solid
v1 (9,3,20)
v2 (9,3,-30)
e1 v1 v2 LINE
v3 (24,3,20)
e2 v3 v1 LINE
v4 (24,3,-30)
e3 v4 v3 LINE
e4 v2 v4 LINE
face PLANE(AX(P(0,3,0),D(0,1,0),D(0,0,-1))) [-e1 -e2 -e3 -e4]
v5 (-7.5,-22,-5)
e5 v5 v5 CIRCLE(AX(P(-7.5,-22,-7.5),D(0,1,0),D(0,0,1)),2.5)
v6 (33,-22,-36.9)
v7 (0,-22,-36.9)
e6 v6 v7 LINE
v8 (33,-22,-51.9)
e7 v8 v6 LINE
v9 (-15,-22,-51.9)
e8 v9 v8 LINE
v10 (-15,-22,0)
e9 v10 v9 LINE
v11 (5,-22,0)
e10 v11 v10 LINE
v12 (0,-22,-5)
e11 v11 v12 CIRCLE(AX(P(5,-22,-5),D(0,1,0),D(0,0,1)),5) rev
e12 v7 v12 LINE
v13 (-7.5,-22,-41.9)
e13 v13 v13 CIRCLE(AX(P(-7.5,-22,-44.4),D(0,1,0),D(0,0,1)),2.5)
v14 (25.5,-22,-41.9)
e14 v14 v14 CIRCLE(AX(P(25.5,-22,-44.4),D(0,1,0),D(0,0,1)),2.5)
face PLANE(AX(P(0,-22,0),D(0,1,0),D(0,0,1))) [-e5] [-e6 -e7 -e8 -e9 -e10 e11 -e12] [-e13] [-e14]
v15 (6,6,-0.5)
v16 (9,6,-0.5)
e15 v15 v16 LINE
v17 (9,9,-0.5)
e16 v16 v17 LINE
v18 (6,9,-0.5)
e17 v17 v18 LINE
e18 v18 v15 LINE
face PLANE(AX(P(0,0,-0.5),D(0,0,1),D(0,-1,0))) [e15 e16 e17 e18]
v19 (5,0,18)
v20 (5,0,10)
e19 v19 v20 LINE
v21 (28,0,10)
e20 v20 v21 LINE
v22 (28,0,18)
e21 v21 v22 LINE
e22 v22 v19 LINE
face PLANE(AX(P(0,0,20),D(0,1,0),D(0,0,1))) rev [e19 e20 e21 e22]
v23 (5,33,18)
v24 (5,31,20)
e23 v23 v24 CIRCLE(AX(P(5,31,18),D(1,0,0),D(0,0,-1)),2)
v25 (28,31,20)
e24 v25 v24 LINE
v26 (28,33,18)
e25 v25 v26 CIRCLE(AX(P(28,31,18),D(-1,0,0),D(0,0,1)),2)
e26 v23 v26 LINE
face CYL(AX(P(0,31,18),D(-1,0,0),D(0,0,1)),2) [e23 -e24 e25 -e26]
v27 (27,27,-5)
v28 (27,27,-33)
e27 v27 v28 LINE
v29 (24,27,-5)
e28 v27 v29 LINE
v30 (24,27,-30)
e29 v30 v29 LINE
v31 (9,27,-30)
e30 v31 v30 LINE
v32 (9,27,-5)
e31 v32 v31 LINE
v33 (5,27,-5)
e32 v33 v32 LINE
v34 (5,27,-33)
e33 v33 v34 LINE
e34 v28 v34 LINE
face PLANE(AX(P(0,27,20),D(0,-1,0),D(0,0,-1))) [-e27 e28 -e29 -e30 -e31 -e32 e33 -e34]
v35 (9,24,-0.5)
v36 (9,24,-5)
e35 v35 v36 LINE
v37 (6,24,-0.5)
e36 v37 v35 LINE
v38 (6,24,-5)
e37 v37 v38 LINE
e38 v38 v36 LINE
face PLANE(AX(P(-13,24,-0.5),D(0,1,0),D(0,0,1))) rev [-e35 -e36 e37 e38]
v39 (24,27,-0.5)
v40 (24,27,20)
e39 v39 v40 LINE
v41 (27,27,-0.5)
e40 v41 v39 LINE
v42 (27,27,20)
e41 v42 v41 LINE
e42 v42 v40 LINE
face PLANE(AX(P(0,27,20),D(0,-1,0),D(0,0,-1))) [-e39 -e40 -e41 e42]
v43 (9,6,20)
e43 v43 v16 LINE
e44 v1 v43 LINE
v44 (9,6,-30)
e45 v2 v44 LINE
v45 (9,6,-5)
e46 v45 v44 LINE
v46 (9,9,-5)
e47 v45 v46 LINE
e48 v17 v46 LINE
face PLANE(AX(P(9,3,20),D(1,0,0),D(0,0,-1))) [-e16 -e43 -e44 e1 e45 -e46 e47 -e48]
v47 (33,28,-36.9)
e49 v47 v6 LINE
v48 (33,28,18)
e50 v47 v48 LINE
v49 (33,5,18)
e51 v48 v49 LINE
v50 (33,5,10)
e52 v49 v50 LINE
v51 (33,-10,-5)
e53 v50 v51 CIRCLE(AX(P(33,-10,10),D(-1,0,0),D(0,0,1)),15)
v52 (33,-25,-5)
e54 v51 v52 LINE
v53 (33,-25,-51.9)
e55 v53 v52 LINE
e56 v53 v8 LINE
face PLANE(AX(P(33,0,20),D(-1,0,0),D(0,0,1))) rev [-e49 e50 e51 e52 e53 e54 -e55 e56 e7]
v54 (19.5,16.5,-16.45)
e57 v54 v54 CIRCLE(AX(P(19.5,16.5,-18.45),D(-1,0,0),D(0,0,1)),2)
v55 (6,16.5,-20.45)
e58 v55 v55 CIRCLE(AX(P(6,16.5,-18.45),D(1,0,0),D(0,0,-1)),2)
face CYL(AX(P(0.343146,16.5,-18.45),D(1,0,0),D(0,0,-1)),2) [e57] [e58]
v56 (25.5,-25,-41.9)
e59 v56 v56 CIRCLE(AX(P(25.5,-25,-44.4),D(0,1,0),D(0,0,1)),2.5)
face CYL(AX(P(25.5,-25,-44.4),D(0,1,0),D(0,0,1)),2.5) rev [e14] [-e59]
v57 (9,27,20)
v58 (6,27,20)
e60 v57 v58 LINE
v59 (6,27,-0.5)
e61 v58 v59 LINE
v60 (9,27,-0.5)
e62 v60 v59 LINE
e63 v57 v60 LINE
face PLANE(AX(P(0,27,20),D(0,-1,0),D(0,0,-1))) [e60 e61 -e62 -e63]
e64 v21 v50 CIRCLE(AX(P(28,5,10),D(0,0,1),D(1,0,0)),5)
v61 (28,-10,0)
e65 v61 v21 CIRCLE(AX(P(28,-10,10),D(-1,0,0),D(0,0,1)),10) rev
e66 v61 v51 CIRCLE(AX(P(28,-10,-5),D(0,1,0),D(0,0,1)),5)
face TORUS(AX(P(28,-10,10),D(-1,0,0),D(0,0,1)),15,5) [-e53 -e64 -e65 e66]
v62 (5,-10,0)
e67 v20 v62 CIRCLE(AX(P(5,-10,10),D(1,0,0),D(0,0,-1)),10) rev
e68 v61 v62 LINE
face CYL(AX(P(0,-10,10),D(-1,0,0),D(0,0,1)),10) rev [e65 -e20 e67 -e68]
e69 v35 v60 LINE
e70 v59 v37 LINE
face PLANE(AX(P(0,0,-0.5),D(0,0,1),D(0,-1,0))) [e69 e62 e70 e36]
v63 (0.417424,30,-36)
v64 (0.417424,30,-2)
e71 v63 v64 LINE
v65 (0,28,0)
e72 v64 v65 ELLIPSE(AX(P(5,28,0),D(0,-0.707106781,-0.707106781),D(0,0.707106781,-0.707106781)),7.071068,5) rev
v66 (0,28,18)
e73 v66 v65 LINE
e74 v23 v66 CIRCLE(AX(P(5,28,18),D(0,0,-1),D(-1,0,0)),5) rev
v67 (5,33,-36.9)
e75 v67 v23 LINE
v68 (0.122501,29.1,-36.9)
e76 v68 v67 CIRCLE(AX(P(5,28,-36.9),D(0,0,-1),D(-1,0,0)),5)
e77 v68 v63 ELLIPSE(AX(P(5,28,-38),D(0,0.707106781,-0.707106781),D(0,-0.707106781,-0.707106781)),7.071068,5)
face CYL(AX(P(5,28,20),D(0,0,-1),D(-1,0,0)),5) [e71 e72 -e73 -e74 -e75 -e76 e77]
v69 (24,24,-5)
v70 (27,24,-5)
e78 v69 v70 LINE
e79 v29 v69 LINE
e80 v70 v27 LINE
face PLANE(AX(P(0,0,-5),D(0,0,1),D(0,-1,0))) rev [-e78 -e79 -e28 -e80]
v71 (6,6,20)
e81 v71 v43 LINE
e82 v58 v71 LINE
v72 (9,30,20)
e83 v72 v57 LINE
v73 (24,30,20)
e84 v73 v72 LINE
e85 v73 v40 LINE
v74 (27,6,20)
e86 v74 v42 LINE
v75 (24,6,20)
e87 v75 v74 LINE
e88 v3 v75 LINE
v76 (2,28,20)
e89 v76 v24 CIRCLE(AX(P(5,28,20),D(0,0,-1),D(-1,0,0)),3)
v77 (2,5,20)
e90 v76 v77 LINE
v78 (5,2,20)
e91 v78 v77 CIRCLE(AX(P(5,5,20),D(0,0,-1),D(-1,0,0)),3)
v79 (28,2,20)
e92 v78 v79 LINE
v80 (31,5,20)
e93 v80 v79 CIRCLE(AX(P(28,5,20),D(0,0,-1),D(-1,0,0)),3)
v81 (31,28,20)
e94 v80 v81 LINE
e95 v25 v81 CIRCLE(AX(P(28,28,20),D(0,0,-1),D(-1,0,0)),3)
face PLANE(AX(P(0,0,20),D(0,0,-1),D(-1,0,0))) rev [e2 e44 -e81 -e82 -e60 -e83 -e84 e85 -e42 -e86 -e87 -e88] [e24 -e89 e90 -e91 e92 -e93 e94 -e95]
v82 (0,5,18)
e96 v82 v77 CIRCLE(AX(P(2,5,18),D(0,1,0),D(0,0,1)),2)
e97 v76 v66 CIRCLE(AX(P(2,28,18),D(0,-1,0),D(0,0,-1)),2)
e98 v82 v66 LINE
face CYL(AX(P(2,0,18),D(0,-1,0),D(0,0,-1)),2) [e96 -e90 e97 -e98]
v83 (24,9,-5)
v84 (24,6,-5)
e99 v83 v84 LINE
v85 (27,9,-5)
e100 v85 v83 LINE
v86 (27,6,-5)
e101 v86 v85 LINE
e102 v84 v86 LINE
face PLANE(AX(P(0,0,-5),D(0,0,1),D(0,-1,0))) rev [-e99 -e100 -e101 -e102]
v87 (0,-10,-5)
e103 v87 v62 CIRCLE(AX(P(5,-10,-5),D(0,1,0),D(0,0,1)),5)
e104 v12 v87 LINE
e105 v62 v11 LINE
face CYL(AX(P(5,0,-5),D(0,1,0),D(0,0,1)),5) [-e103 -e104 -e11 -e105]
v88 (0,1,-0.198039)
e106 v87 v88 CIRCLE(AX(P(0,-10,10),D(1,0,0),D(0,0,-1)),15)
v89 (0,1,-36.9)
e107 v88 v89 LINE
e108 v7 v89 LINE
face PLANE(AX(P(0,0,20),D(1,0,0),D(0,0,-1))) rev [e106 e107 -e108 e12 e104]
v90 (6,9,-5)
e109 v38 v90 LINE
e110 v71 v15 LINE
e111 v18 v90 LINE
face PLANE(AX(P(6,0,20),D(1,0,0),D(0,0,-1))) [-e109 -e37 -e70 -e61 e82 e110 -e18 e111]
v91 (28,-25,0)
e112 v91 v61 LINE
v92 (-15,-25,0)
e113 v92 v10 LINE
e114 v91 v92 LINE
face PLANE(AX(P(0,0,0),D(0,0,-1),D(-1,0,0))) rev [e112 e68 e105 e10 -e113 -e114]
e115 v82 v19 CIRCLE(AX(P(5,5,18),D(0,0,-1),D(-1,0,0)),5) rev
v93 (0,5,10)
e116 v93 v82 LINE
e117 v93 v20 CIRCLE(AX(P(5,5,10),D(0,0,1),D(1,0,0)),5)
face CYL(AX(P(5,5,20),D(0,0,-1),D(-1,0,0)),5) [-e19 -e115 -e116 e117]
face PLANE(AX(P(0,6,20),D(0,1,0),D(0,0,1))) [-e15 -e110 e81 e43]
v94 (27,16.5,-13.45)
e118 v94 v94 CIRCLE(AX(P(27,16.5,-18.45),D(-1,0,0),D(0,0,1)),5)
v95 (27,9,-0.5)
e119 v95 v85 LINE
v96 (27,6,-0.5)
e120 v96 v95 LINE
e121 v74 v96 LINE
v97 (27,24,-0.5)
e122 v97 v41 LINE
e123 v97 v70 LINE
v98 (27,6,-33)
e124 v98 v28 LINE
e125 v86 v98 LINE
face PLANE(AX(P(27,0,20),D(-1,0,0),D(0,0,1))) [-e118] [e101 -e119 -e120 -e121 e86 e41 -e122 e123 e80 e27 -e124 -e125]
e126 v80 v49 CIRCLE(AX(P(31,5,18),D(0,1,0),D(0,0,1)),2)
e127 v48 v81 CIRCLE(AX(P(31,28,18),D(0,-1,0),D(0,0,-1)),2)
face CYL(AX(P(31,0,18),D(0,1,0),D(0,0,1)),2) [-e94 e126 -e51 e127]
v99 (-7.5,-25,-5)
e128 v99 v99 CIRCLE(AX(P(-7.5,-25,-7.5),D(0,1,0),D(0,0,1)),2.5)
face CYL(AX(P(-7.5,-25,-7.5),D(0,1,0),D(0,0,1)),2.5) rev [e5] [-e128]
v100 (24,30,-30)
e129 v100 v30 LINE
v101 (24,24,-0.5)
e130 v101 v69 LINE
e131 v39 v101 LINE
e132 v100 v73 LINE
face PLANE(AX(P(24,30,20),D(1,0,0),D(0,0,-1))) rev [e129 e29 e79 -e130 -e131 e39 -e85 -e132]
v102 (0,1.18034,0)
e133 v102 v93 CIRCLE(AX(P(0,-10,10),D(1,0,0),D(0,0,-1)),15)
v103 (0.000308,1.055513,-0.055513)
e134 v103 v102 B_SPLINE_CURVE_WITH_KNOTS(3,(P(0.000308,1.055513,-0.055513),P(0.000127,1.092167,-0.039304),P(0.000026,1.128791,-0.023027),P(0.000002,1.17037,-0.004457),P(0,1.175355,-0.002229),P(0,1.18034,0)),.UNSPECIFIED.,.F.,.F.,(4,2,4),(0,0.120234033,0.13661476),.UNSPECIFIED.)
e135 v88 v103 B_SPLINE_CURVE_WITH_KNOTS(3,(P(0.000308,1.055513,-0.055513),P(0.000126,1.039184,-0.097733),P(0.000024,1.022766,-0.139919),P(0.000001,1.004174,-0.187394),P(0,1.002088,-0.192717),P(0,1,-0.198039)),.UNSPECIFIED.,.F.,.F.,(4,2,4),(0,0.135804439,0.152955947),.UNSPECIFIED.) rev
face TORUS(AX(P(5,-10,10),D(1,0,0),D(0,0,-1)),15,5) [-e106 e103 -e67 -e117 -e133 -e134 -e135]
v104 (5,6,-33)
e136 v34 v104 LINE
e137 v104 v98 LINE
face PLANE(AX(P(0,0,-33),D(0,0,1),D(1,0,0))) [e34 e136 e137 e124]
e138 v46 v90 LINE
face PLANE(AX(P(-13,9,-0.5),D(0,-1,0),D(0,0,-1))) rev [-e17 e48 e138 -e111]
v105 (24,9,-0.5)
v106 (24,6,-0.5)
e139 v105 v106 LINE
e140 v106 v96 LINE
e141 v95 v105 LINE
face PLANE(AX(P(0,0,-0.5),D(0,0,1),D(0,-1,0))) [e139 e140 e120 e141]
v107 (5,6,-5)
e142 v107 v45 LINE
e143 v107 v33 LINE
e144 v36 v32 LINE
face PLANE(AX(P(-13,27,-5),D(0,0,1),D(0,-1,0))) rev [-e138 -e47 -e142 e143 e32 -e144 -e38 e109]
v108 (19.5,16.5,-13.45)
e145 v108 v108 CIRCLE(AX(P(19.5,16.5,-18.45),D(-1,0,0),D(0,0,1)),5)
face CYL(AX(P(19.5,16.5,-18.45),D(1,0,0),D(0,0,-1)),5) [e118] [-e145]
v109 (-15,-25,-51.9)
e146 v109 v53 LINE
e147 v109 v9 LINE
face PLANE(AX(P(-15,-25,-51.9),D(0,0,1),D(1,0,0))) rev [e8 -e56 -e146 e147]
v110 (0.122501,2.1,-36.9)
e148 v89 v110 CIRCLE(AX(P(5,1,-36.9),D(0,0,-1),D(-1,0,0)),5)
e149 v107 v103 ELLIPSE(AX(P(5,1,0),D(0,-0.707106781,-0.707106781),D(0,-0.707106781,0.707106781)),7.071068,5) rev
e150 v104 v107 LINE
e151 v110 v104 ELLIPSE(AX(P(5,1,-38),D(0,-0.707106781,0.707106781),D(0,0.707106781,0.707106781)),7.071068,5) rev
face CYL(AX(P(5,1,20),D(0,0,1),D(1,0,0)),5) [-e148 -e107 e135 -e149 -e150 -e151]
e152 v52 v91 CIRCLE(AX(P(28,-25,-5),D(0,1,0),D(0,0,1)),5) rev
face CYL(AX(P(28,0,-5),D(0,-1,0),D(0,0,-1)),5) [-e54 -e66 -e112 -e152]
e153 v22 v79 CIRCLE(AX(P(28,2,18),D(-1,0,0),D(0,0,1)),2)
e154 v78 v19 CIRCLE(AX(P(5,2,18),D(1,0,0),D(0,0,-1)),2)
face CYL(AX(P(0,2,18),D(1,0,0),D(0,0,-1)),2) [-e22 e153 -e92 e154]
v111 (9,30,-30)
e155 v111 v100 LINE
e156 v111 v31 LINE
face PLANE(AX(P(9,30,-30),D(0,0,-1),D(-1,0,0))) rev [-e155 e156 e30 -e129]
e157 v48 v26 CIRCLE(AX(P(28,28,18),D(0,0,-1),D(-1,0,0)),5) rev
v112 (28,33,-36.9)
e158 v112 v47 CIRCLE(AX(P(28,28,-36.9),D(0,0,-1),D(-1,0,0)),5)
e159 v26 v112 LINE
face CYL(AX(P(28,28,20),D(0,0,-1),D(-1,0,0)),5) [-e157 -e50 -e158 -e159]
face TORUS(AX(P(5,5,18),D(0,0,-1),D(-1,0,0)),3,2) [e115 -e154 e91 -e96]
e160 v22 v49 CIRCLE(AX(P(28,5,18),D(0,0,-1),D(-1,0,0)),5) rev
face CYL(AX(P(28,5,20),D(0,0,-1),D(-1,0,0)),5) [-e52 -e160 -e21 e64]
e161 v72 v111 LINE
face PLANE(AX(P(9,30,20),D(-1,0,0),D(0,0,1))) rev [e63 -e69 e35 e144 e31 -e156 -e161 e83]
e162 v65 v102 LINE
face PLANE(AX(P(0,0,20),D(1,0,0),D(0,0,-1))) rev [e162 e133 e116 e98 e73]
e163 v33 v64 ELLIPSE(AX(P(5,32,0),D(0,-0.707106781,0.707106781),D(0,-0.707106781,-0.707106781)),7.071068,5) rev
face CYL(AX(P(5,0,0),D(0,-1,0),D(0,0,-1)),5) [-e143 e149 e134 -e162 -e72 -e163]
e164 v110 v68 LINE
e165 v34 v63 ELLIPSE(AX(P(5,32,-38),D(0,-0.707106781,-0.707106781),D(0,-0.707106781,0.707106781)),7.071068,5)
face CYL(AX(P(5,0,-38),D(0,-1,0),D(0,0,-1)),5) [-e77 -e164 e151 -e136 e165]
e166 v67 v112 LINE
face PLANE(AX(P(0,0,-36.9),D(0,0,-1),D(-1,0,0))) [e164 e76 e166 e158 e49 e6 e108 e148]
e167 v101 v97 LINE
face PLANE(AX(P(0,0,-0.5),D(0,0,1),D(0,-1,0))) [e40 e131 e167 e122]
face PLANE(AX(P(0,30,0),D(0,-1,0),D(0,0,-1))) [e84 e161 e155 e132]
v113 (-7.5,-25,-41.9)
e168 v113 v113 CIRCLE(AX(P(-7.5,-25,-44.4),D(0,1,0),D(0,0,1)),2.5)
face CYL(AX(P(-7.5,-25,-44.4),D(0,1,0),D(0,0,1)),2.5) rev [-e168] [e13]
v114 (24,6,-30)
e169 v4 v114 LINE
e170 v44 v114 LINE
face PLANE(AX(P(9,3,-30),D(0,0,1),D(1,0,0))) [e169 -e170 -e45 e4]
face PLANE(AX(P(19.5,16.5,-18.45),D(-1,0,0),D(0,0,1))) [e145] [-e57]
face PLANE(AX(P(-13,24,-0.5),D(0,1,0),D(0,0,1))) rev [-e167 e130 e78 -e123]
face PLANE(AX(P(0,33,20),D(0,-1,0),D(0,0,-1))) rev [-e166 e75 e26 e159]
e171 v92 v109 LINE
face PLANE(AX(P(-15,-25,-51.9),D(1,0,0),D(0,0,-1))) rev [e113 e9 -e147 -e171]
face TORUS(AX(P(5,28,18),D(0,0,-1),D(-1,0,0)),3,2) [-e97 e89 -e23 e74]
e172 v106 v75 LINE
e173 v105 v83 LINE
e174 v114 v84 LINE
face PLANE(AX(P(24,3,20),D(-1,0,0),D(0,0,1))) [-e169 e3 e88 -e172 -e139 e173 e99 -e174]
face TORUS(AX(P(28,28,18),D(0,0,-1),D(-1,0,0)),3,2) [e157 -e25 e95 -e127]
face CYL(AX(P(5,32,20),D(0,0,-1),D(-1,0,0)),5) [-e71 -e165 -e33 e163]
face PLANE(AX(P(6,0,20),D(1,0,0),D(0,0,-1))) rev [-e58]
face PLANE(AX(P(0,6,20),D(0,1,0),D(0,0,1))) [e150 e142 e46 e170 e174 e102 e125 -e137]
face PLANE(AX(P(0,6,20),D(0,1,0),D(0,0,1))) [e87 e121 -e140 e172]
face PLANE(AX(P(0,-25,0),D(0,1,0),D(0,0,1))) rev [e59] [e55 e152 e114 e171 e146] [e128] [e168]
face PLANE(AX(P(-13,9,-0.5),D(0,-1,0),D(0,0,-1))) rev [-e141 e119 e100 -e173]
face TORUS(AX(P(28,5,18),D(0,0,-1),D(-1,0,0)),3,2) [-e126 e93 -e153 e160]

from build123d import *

# Parameters (mm, degrees)
SKETCH1_W           = 33
SKETCH1_H           = 33
BOSS_EXTRUDE1_DEPTH = 20
SHELL1_T            = -6
SKETCH2_W           = 33
SKETCH2_H           = 55
BOSS_EXTRUDE2_DEPTH = 36.9
SKETCH5_W           = 48
SKETCH5_H           = 51.9
BOSS_EXTRUDE3_DEPTH = 3
SKETCH6_R           = 2.5
CUT_EXTRUDE1_DEPTH  = 83.508242013
SKETCH7_W           = 15
SKETCH7_H           = 50
CUT_EXTRUDE2_DEPTH  = 3
SKETCH9_W           = 21
SKETCH9_H           = 21
CUT_EXTRUDE3_DEPTH  = 39
SKETCH10_R          = 5
BOSS_EXTRUDE4_DEPTH = 7.5
SKETCH12_W          = 28
SKETCH12_H          = 21
CUT_EXTRUDE4_DEPTH  = 19
SKETCH13_R          = 2
BOSS_EXTRUDE5_DEPTH = 13.5
FILLET1_R           = 10
BOSS_EXTRUDE6_START = -25
SKETCH14_W          = 3
SKETCH14_H          = 3
BOSS_EXTRUDE6_DEPTH = 4.5
FILLET2_R           = 2
FILLET3_R           = 5
FILLET4_R           = 5


with BuildPart() as part:
    # Sketch1 → Boss-Extrude1 (new body)
    with BuildSketch(Plane.XY):
        with Locations((16.5, 16.5)):
            Rectangle(SKETCH1_W, SKETCH1_H)
    extrude(amount=BOSS_EXTRUDE1_DEPTH)

    # Shell1
    shell1_openings = [part.faces().sort_by_distance(p)[0] for p in [
        (16.5, 16.5, 20),
    ]]
    offset(amount=SHELL1_T, openings=shell1_openings, kind=Kind.INTERSECTION)

    # Sketch2 → Boss-Extrude2 (add)
    with BuildSketch(Plane(origin=(0, 0, 0), x_dir=(-1, 0, 0), z_dir=(0, 0, -1))):
        with Locations((-16.5, 5.5)):
            Rectangle(SKETCH2_W, SKETCH2_H)
    extrude(amount=BOSS_EXTRUDE2_DEPTH)

    # Sketch5 → Boss-Extrude3 (add)
    with BuildSketch(Plane.XZ.offset(22)):
        with Locations((9, -25.95)):
            Rectangle(SKETCH5_W, SKETCH5_H)
    extrude(amount=BOSS_EXTRUDE3_DEPTH)

    # Sketch6 → Cut-Extrude1 (cut, through all)
    with BuildSketch(Plane(origin=(0, -22, 0), x_dir=(1, 0, 0), z_dir=(0, 1, 0))):
        with Locations(Location((-7.5, 7.5, 0), (0, 0, 270))):
            Circle(SKETCH6_R)
        with Locations(Location((-7.5, 44.4, 0), (0, 0, 270))):
            Circle(SKETCH6_R)
        with Locations(Location((25.5, 44.4, 0), (0, 0, 270))):
            Circle(SKETCH6_R)
    extrude(amount=-CUT_EXTRUDE1_DEPTH, mode=Mode.SUBTRACT)

    # Sketch7 → Cut-Extrude2 (cut)
    with BuildSketch(Plane.XZ.offset(-27)):
        with Locations((16.5, -5)):
            Rectangle(SKETCH7_W, SKETCH7_H)
    cut_extrude2 = extrude(amount=-CUT_EXTRUDE2_DEPTH, mode=Mode.SUBTRACT)

    # Mirror2: Cut-Extrude2 across plane
    add(cut_extrude2.mirror(Plane(origin=(0, 16.5, 0), x_dir=(0, 0, 1), z_dir=(0, -1, 0))), mode=Mode.SUBTRACT)

    # Sketch9 → Cut-Extrude3 (cut)
    with BuildSketch(Plane.XY.offset(6)):
        with Locations((16.5, 16.5)):
            Rectangle(SKETCH9_W, SKETCH9_H)
    extrude(amount=-CUT_EXTRUDE3_DEPTH, mode=Mode.SUBTRACT)

    # Sketch10 → Boss-Extrude4 (add)
    with BuildSketch(Plane.ZY.offset(-27)):
        with Locations((-18.45, 16.5)):
            Circle(SKETCH10_R)
    extrude(amount=BOSS_EXTRUDE4_DEPTH)

    # Sketch12 → Cut-Extrude4 (cut)
    with BuildSketch(Plane(origin=(6, 0, 0), x_dir=(0, 0, -1), z_dir=(1, 0, 0))):
        with Locations((19, 16.5)):
            Rectangle(SKETCH12_W, SKETCH12_H)
    extrude(amount=-CUT_EXTRUDE4_DEPTH, mode=Mode.SUBTRACT)

    # Sketch13 → Boss-Extrude5 (add)
    with BuildSketch(Plane.ZY.offset(-19.5)):
        with Locations(Location((-18.45, 16.5, 0), (0, 0, 180))):
            Circle(SKETCH13_R)
    extrude(amount=BOSS_EXTRUDE5_DEPTH)

    # Fillet1
    fillet1_edges = [part.edges().sort_by_distance(p)[0] for p in [
        (16.5, 0, 0),
    ]]
    fillet(fillet1_edges, radius=FILLET1_R)

    # Sketch14 → Boss-Extrude6 (add)
    with BuildSketch(Plane.XY.offset(20).offset(BOSS_EXTRUDE6_START)):
        with Locations((7.5, 7.5)):
            Rectangle(SKETCH14_W, SKETCH14_H)
        with Locations((7.5, 25.5)):
            Rectangle(SKETCH14_W, SKETCH14_H)
        with Locations((25.5, 25.5)):
            Rectangle(SKETCH14_W, SKETCH14_H)
        with Locations((25.5, 7.5)):
            Rectangle(SKETCH14_W, SKETCH14_H)
    extrude(amount=BOSS_EXTRUDE6_DEPTH)

    # Fillet2
    fillet2_edges = [part.edges().sort_by_distance(p)[0] for p in [
        (33, 16.5, 20),
        (16.5, 33, 20),
        (0, 16.5, 20),
        (16.5, 0, 20),
    ]]
    fillet(fillet2_edges, radius=FILLET2_R)

    # Fillet3
    # the kernel refuses this fillet: 5 mm, written as the material it takes off along each edge
    with BuildSketch(Plane(origin=(5, 28, 20), x_dir=(0, 1, 0), z_dir=(1, 0, 0))) as fillet3_piece_1:
        with BuildLine():
            CenterArc((3, -2), 2, 0, 90)
            Line((5, -2), (5, 0))
            Line((5, 0), (3, 0))
        make_face()
    revolve(axis=Axis((5, 28, 20), (0, 0, 1)), revolution_arc=90, mode=Mode.SUBTRACT)
    with BuildSketch(Plane(origin=(28, 28, 20), x_dir=(1, 0, 0), z_dir=(0, -1, 0))) as fillet3_piece_2:
        with BuildLine():
            CenterArc((3, -2), 2, 0, 90)
            Line((5, -2), (5, 0))
            Line((5, 0), (3, 0))
        make_face()
    revolve(axis=Axis((28, 28, 20), (0, 0, 1)), revolution_arc=90, mode=Mode.SUBTRACT)
    with BuildSketch(Plane(origin=(0, 6, -33), x_dir=(0, 0, -1), z_dir=(0, 1, 0)), Plane(origin=(0, 27, -5), x_dir=(0, 0, 1), z_dir=(0, -1, 0))) as fillet3_piece_3:
        with BuildLine():
            CenterArc((FILLET3_R, -FILLET3_R), FILLET3_R, 90, 90)
            Line((0, -FILLET3_R), (-FILLET3_R * 0.02, -FILLET3_R))
            Line((-FILLET3_R * 0.02, -FILLET3_R), (-FILLET3_R * 0.02, FILLET3_R * 0.02))
            Line((-FILLET3_R * 0.02, FILLET3_R * 0.02), (FILLET3_R, FILLET3_R * 0.02))
            Line((FILLET3_R, FILLET3_R * 0.02), (FILLET3_R, 0))
        make_face()
    extrude(amount=21, mode=Mode.SUBTRACT)
    with BuildSketch(Plane(origin=(0, 6, -5), x_dir=(0, -1, 0), z_dir=(0, 0, -1)), Plane(origin=(0, 27, -33), x_dir=(0, 1, 0), z_dir=(0, 0, 1))) as fillet3_piece_4:
        with BuildLine():
            CenterArc((FILLET3_R, -FILLET3_R), FILLET3_R, 90, 90)
            Line((0, -FILLET3_R), (-FILLET3_R * 0.02, -FILLET3_R))
            Line((-FILLET3_R * 0.02, -FILLET3_R), (-FILLET3_R * 0.02, FILLET3_R * 0.02))
            Line((-FILLET3_R * 0.02, FILLET3_R * 0.02), (FILLET3_R, FILLET3_R * 0.02))
            Line((FILLET3_R, FILLET3_R * 0.02), (FILLET3_R, 0))
        make_face()
    extrude(amount=28, mode=Mode.SUBTRACT)
    with BuildSketch(Plane(origin=(33, 33, -36.9), x_dir=(0, -1, 0), z_dir=(0, 0, 1)), Plane(origin=(0, 33, 20), x_dir=(0, -1, 0), z_dir=(0, 0, -1))) as fillet3_piece_5:
        with BuildLine():
            CenterArc((FILLET3_R, -FILLET3_R), FILLET3_R, 90, 90)
            Line((0, -FILLET3_R), (-FILLET3_R * 0.02, -FILLET3_R))
            Line((-FILLET3_R * 0.02, -FILLET3_R), (-FILLET3_R * 0.02, FILLET3_R * 0.02))
            Line((-FILLET3_R * 0.02, FILLET3_R * 0.02), (FILLET3_R, FILLET3_R * 0.02))
            Line((FILLET3_R, FILLET3_R * 0.02), (FILLET3_R, 0))
        make_face()
    extrude(amount=56.9, mode=Mode.SUBTRACT)
    with BuildSketch(Plane(origin=(0, 6, -5), x_dir=(0, -1, 0), z_dir=(0, 0, -1))) as fillet3_piece_6a_section:
        with BuildLine():
            CenterArc((FILLET3_R, -FILLET3_R), FILLET3_R, 90, 90)
            Line((0, -FILLET3_R), (-FILLET3_R * 0.02, -FILLET3_R))
            Line((-FILLET3_R * 0.02, -FILLET3_R), (-FILLET3_R * 0.02, FILLET3_R * 0.02))
            Line((-FILLET3_R * 0.02, FILLET3_R * 0.02), (FILLET3_R, FILLET3_R * 0.02))
            Line((FILLET3_R, FILLET3_R * 0.02), (FILLET3_R, 0))
        make_face()
    fillet3_piece_6a = extrude(amount=40.5, mode=Mode.PRIVATE)
    fillet3_piece_6a = split(fillet3_piece_6a, bisect_by=Plane(origin=(1.131975571, 4.868024429, -33), z_dir=(0, 0, -1)), keep=Keep.TOP, mode=Mode.PRIVATE)
    with BuildSketch(Plane(origin=(0, -6.5, -33), x_dir=(0, 0, -1), z_dir=(0, 1, 0))) as fillet3_piece_6b_section:
        with BuildLine():
            CenterArc((FILLET3_R, -FILLET3_R), FILLET3_R, 90, 90)
            Line((0, -FILLET3_R), (-FILLET3_R * 0.02, -FILLET3_R))
            Line((-FILLET3_R * 0.02, -FILLET3_R), (-FILLET3_R * 0.02, FILLET3_R * 0.02))
            Line((-FILLET3_R * 0.02, FILLET3_R * 0.02), (FILLET3_R, FILLET3_R * 0.02))
            Line((FILLET3_R, FILLET3_R * 0.02), (FILLET3_R, 0))
        make_face()
    fillet3_piece_6b = extrude(amount=33.5, mode=Mode.PRIVATE)
    fillet3_piece_6b = split(fillet3_piece_6b, bisect_by=Plane(origin=(1.131975571, 6, -34.131975571), z_dir=(0, -1, 0)), keep=Keep.TOP, mode=Mode.PRIVATE)
    fillet3_piece_6 = fillet3_piece_6a & fillet3_piece_6b
    add(fillet3_piece_6, mode=Mode.SUBTRACT)
    with BuildSketch(Plane(origin=(0, 27, -45.5), x_dir=(0, 1, 0), z_dir=(0, 0, 1))) as fillet3_piece_7a_section:
        with BuildLine():
            CenterArc((FILLET3_R, -FILLET3_R), FILLET3_R, 90, 90)
            Line((0, -FILLET3_R), (-FILLET3_R * 0.02, -FILLET3_R))
            Line((-FILLET3_R * 0.02, -FILLET3_R), (-FILLET3_R * 0.02, FILLET3_R * 0.02))
            Line((-FILLET3_R * 0.02, FILLET3_R * 0.02), (FILLET3_R, FILLET3_R * 0.02))
            Line((FILLET3_R, FILLET3_R * 0.02), (FILLET3_R, 0))
        make_face()
    fillet3_piece_7a = extrude(amount=40.5, mode=Mode.PRIVATE)
    fillet3_piece_7a = split(fillet3_piece_7a, bisect_by=Plane(origin=(1.131975571, 28.131975571, -33), z_dir=(0, 0, -1)), keep=Keep.TOP, mode=Mode.PRIVATE)
    with BuildSketch(Plane(origin=(0, 6, -33), x_dir=(0, 0, -1), z_dir=(0, 1, 0))) as fillet3_piece_7b_section:
        with BuildLine():
            CenterArc((FILLET3_R, -FILLET3_R), FILLET3_R, 90, 90)
            Line((0, -FILLET3_R), (-FILLET3_R * 0.02, -FILLET3_R))
            Line((-FILLET3_R * 0.02, -FILLET3_R), (-FILLET3_R * 0.02, FILLET3_R * 0.02))
            Line((-FILLET3_R * 0.02, FILLET3_R * 0.02), (FILLET3_R, FILLET3_R * 0.02))
            Line((FILLET3_R, FILLET3_R * 0.02), (FILLET3_R, 0))
        make_face()
    fillet3_piece_7b = extrude(amount=33.5, mode=Mode.PRIVATE)
    fillet3_piece_7b = split(fillet3_piece_7b, bisect_by=Plane(origin=(1.131975571, 27, -34.131975571), z_dir=(0, 1, 0)), keep=Keep.TOP, mode=Mode.PRIVATE)
    fillet3_piece_7 = fillet3_piece_7a & fillet3_piece_7b
    add(fillet3_piece_7, mode=Mode.SUBTRACT)
    with BuildSketch(Plane(origin=(0, 27, -5), x_dir=(0, 0, 1), z_dir=(0, -1, 0))) as fillet3_piece_8a_section:
        with BuildLine():
            CenterArc((FILLET3_R, -FILLET3_R), FILLET3_R, 90, 90)
            Line((0, -FILLET3_R), (-FILLET3_R * 0.02, -FILLET3_R))
            Line((-FILLET3_R * 0.02, -FILLET3_R), (-FILLET3_R * 0.02, FILLET3_R * 0.02))
            Line((-FILLET3_R * 0.02, FILLET3_R * 0.02), (FILLET3_R, FILLET3_R * 0.02))
            Line((FILLET3_R, FILLET3_R * 0.02), (FILLET3_R, 0))
        make_face()
    fillet3_piece_8a = extrude(amount=33.5, mode=Mode.PRIVATE)
    fillet3_piece_8a = split(fillet3_piece_8a, bisect_by=Plane(origin=(1.131975571, 6, -3.868024429), z_dir=(0, -1, 0)), keep=Keep.TOP, mode=Mode.PRIVATE)
    with BuildSketch(Plane(origin=(0, 6, 7.5), x_dir=(0, -1, 0), z_dir=(0, 0, -1))) as fillet3_piece_8b_section:
        with BuildLine():
            CenterArc((FILLET3_R, -FILLET3_R), FILLET3_R, 90, 90)
            Line((0, -FILLET3_R), (-FILLET3_R * 0.02, -FILLET3_R))
            Line((-FILLET3_R * 0.02, -FILLET3_R), (-FILLET3_R * 0.02, FILLET3_R * 0.02))
            Line((-FILLET3_R * 0.02, FILLET3_R * 0.02), (FILLET3_R, FILLET3_R * 0.02))
            Line((FILLET3_R, FILLET3_R * 0.02), (FILLET3_R, 0))
        make_face()
    fillet3_piece_8b = extrude(amount=40.5, mode=Mode.PRIVATE)
    fillet3_piece_8b = split(fillet3_piece_8b, bisect_by=Plane(origin=(1.131975571, 4.868024429, -5), z_dir=(0, 0, 1)), keep=Keep.TOP, mode=Mode.PRIVATE)
    fillet3_piece_8 = fillet3_piece_8a & fillet3_piece_8b
    add(fillet3_piece_8, mode=Mode.SUBTRACT)
    with BuildSketch(Plane(origin=(0, 27, -33), x_dir=(0, 1, 0), z_dir=(0, 0, 1))) as fillet3_piece_9a_section:
        with BuildLine():
            CenterArc((FILLET3_R, -FILLET3_R), FILLET3_R, 90, 90)
            Line((0, -FILLET3_R), (-FILLET3_R * 0.02, -FILLET3_R))
            Line((-FILLET3_R * 0.02, -FILLET3_R), (-FILLET3_R * 0.02, FILLET3_R * 0.02))
            Line((-FILLET3_R * 0.02, FILLET3_R * 0.02), (FILLET3_R, FILLET3_R * 0.02))
            Line((FILLET3_R, FILLET3_R * 0.02), (FILLET3_R, 0))
        make_face()
    fillet3_piece_9a = extrude(amount=40.5, mode=Mode.PRIVATE)
    fillet3_piece_9a = split(fillet3_piece_9a, bisect_by=Plane(origin=(1.131975571, 28.131975571, -5), z_dir=(0, 0, 1)), keep=Keep.TOP, mode=Mode.PRIVATE)
    with BuildSketch(Plane(origin=(0, 39.5, -5), x_dir=(0, 0, 1), z_dir=(0, -1, 0))) as fillet3_piece_9b_section:
        with BuildLine():
            CenterArc((FILLET3_R, -FILLET3_R), FILLET3_R, 90, 90)
            Line((0, -FILLET3_R), (-FILLET3_R * 0.02, -FILLET3_R))
            Line((-FILLET3_R * 0.02, -FILLET3_R), (-FILLET3_R * 0.02, FILLET3_R * 0.02))
            Line((-FILLET3_R * 0.02, FILLET3_R * 0.02), (FILLET3_R, FILLET3_R * 0.02))
            Line((FILLET3_R, FILLET3_R * 0.02), (FILLET3_R, 0))
        make_face()
    fillet3_piece_9b = extrude(amount=33.5, mode=Mode.PRIVATE)
    fillet3_piece_9b = split(fillet3_piece_9b, bisect_by=Plane(origin=(1.131975571, 27, -3.868024429), z_dir=(0, 1, 0)), keep=Keep.TOP, mode=Mode.PRIVATE)
    fillet3_piece_9 = fillet3_piece_9a & fillet3_piece_9b
    add(fillet3_piece_9, mode=Mode.SUBTRACT)

    # Fillet4
    # the kernel refuses this fillet: 5 mm, written as the material it takes off along each edge
    with BuildSketch(Plane(origin=(5, 5, 20), x_dir=(-1, 0, 0), z_dir=(0, 1, 0))) as fillet4_piece_1:
        with BuildLine():
            CenterArc((3, -2), 2, 0, 90)
            Line((5, -2), (5, 0))
            Line((5, 0), (3, 0))
        make_face()
    revolve(axis=Axis((5, 5, 20), (0, 0, 1)), revolution_arc=90, mode=Mode.SUBTRACT)
    with BuildSketch(Plane(origin=(28, 5, 20), x_dir=(0, -1, 0), z_dir=(-1, 0, 0))) as fillet4_piece_2:
        with BuildLine():
            CenterArc((3, -2), 2, 0, 90)
            Line((5, -2), (5, 0))
            Line((5, 0), (3, 0))
        make_face()
    revolve(axis=Axis((28, 5, 20), (0, 0, 1)), revolution_arc=90, mode=Mode.SUBTRACT)
    with BuildSketch(Plane(origin=(33, 0, 10), x_dir=(-1, 0, 0), z_dir=(0, 0, 1))) as fillet4_piece_3:
        with BuildLine():
            CenterArc((FILLET4_R, -FILLET4_R), FILLET4_R, 90, 90)
            Line((0, -FILLET4_R), (0, 0))
            Line((0, 0), (FILLET4_R, 0))
        make_face()
    extrude(amount=10, mode=Mode.SUBTRACT)
    with BuildSketch(Plane(origin=(33, -10, 0), x_dir=(0, 0, -1), z_dir=(0, -1, 0))) as fillet4_piece_4:
        with BuildLine():
            CenterArc((FILLET4_R, -FILLET4_R), FILLET4_R, 90, 90)
            Line((0, -FILLET4_R), (0, 0))
            Line((0, 0), (FILLET4_R, 0))
        make_face()
    extrude(amount=27.5, mode=Mode.SUBTRACT)
    with BuildSketch(Plane(origin=(0, -22, 0), x_dir=(1, 0, 0), z_dir=(0, 1, 0))) as fillet4_piece_5:
        with BuildLine():
            CenterArc((FILLET4_R, FILLET4_R), FILLET4_R, 180, 90)
            Line((0, FILLET4_R), (0, 0))
            Line((0, 0), (FILLET4_R, 0))
        make_face()
    extrude(amount=12, mode=Mode.SUBTRACT)
    with BuildSketch(Plane(origin=(0, 0, 10), x_dir=(1, 0, 0), z_dir=(0, 0, 1))) as fillet4_piece_6:
        with BuildLine():
            CenterArc((FILLET4_R, FILLET4_R), FILLET4_R, 180, 90)
            Line((0, FILLET4_R), (0, 0))
            Line((0, 0), (FILLET4_R, 0))
        make_face()
    extrude(amount=10, mode=Mode.SUBTRACT)
    with BuildSketch(Plane(origin=(33, -10, 10), x_dir=(0, 1, 0), z_dir=(0, 0, 1))) as fillet4_piece_7:
        with BuildLine():
            CenterArc((10 + FILLET4_R, FILLET4_R), FILLET4_R, 180, 90)
            Line((10, FILLET4_R), (10, 0))
            Line((10, 0), (10 + FILLET4_R, 0))
        make_face()
    revolve(axis=Axis((33, -10, 10), (-1, 0, 0)), revolution_arc=90, mode=Mode.SUBTRACT)
    with BuildSketch(Plane(origin=(0, -10, 10), x_dir=(0, 1, 0), z_dir=(0, 0, 1))) as fillet4_piece_8:
        with BuildLine():
            CenterArc((10 + FILLET4_R, -FILLET4_R), FILLET4_R, 90, 90)
            Line((10 + FILLET4_R, 0), (10, 0))
            Line((10, 0), (10, -FILLET4_R))
        make_face()
    revolve(axis=Axis((0, -10, 10), (-1, 0, 0)), revolution_arc=90, mode=Mode.SUBTRACT)


solid = part.part
